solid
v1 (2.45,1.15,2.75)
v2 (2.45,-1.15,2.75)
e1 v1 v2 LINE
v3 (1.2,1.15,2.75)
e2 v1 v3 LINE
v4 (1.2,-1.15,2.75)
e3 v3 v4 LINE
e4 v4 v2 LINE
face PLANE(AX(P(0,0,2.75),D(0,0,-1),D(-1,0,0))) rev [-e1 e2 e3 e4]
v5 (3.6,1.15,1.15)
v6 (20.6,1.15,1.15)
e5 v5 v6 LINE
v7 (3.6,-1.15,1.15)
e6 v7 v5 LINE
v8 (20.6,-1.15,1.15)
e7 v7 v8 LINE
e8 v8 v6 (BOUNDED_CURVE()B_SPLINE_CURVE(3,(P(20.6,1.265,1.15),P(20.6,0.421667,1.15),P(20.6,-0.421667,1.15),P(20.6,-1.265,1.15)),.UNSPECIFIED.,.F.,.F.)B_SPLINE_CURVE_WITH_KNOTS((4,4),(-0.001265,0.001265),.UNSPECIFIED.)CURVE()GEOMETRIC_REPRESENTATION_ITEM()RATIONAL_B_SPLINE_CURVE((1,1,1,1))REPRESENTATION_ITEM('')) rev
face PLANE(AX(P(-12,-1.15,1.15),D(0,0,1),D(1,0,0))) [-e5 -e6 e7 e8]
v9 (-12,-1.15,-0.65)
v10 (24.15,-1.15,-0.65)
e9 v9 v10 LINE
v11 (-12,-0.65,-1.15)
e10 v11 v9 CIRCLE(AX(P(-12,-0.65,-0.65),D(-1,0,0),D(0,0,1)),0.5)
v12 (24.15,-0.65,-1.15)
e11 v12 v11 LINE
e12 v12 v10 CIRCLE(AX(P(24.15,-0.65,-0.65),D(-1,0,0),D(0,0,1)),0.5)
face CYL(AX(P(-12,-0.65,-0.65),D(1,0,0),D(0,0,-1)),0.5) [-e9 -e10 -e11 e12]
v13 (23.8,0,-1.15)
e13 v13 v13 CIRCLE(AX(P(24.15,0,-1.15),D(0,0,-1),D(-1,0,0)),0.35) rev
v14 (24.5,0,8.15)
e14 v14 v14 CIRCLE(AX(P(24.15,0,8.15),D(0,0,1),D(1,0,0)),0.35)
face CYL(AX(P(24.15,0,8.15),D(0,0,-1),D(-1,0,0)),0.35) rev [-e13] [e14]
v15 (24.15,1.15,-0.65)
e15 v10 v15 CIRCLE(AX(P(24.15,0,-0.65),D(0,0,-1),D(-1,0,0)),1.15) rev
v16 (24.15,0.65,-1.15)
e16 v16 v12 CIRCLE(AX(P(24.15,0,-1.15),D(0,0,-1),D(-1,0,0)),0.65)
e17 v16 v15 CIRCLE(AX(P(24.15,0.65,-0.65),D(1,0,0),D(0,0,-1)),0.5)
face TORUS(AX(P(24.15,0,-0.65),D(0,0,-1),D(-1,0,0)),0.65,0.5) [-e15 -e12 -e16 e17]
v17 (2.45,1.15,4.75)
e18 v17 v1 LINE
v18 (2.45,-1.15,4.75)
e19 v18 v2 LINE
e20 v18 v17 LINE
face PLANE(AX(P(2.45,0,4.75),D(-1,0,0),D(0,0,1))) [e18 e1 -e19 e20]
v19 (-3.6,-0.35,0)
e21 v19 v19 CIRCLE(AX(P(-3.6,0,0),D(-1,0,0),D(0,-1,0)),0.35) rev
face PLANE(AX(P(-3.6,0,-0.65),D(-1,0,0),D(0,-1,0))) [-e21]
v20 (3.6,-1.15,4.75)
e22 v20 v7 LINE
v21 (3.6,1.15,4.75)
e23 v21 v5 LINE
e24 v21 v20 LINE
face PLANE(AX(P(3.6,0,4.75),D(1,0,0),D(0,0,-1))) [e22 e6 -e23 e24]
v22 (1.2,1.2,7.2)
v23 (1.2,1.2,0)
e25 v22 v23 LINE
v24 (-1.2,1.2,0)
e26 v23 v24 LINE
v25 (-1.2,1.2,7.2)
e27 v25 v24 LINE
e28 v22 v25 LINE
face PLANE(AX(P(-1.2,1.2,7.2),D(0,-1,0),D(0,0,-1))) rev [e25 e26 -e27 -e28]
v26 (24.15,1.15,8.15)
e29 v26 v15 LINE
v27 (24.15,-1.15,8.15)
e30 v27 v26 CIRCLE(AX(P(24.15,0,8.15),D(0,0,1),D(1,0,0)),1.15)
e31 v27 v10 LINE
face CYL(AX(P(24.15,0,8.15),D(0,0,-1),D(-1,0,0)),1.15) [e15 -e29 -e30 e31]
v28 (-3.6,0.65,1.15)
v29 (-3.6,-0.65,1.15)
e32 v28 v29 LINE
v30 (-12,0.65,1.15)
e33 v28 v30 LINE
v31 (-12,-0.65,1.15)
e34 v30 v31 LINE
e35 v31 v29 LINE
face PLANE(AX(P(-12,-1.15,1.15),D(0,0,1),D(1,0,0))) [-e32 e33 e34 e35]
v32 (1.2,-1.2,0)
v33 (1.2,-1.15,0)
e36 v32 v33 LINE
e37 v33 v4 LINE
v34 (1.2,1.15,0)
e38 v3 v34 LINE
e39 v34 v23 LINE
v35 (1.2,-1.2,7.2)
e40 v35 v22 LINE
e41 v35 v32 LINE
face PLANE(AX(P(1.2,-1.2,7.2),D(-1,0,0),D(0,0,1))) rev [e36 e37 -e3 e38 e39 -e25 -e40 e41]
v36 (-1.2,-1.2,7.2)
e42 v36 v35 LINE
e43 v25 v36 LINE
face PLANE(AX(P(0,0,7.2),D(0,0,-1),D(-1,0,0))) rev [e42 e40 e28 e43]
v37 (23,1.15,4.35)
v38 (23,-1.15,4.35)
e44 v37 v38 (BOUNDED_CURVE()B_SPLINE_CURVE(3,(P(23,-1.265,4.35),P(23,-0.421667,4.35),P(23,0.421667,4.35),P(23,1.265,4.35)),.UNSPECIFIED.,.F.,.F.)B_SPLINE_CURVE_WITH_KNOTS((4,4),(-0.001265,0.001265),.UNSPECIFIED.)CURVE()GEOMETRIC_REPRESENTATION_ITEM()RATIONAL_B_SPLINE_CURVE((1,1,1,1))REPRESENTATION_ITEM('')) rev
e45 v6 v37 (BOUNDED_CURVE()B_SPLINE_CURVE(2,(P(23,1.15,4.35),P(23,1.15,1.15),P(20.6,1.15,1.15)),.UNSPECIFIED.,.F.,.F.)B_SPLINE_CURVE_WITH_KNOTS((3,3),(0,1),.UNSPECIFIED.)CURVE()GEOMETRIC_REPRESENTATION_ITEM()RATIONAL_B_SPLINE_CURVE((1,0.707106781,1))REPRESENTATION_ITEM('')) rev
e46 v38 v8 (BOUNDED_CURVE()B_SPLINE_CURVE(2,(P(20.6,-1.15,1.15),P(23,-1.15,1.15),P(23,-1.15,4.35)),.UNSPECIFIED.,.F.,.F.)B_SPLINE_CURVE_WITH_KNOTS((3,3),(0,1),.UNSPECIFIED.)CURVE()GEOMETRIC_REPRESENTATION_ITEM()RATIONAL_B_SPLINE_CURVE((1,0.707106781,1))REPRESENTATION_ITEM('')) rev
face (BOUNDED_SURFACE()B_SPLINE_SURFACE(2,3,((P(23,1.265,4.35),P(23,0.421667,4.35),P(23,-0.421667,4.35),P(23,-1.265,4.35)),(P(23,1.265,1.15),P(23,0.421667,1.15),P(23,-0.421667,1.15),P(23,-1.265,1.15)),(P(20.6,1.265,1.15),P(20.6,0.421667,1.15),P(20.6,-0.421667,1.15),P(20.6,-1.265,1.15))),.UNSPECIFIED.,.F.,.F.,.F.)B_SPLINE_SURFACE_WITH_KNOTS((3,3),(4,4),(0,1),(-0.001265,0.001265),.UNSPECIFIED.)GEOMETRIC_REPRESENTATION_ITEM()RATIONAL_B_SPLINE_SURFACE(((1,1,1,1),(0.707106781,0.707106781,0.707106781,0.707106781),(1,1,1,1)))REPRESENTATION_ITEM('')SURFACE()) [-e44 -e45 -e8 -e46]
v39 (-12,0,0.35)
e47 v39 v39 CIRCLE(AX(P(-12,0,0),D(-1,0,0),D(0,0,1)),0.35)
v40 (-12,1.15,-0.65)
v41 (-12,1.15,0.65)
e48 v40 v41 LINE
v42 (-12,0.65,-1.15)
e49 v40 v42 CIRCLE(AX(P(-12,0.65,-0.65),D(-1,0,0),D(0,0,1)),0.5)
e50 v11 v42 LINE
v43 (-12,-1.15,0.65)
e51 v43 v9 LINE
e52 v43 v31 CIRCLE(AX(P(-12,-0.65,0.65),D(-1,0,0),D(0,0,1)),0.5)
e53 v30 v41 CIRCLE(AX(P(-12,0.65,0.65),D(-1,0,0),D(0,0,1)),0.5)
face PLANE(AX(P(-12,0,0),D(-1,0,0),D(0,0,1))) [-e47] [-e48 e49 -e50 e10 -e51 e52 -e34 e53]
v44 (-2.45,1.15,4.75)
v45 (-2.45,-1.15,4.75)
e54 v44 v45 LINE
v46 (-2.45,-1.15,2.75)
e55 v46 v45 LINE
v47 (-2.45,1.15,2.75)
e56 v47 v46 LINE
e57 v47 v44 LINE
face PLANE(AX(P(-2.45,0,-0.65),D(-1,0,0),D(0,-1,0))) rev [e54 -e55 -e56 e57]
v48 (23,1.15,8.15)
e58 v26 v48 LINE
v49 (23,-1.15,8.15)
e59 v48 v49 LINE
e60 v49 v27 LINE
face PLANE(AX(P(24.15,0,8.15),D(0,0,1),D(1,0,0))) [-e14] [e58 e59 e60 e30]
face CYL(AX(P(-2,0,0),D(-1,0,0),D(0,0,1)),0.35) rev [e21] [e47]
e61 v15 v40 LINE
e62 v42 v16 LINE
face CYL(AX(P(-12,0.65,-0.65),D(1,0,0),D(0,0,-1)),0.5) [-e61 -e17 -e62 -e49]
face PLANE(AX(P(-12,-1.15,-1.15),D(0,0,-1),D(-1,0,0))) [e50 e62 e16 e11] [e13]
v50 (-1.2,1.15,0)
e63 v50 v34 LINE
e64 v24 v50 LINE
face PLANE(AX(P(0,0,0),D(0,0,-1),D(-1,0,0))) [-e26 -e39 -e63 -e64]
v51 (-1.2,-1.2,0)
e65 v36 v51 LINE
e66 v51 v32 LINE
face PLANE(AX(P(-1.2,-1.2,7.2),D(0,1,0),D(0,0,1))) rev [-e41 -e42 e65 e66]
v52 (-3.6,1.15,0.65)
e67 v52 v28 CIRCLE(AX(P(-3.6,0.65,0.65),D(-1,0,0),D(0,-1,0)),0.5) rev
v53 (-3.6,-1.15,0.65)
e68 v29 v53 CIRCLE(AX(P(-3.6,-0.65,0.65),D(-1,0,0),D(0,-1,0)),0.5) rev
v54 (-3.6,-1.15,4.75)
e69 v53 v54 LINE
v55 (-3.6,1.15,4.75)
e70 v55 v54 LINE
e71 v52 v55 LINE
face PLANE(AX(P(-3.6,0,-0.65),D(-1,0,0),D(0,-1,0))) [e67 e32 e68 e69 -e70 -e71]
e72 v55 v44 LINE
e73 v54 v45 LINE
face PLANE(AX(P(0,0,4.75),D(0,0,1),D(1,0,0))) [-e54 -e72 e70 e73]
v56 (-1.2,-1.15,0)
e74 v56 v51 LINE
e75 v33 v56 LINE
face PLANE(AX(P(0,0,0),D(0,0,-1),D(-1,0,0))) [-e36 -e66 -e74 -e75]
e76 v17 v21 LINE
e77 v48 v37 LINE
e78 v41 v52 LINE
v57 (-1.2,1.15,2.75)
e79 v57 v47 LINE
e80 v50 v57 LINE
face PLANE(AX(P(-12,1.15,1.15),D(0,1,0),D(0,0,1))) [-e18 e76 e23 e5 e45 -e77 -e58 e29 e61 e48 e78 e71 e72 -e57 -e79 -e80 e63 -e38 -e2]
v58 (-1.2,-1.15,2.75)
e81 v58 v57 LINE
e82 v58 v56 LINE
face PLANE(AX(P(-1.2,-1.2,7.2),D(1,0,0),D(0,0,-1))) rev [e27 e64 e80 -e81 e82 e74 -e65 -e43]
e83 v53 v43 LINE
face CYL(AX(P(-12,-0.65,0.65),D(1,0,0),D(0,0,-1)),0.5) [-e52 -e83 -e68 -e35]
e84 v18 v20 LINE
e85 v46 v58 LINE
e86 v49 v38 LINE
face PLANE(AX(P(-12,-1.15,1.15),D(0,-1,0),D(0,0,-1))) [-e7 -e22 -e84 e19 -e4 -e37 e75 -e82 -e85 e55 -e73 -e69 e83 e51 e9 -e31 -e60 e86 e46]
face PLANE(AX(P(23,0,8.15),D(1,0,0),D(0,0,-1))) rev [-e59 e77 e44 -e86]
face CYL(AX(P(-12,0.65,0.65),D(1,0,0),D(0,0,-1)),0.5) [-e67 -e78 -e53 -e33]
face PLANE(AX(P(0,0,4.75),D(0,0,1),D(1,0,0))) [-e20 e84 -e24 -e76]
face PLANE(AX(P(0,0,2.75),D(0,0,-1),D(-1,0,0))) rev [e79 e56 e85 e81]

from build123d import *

# Parameters (mm, degrees)
SKETCH_1_W           = 2.4
SKETCH_1_H           = 2.4
EXTRUDE_1_DEPTH      = 7.2
EXTRUDE_2_DEPTH      = 23
EXTRUDE_2_DEPTH_BACK = 12
SKETCH_4_W           = 2.3
SKETCH_4_H           = 2.3
EXTRUDE_3_DEPTH      = 7
EXTRUDE_3_DEPTH_BACK = 2.3
SKETCH_5_R           = 0.35
SKETCH_6_R           = 0.35
CUT_EXTRUDE_1_DEPTH  = 10
FILLET_1_SIZE        = 2.4
FILLET_1_SIZE_2      = 3.2
FILLET_2_R           = 0.5
EXTRUDE_START        = -1.5
SKETCH_7_W           = 1.15
SKETCH_7_H           = 0.5
SKETCH_7_H_2         = 1.3
SKETCH_7_H_3         = 2.3
EXTRUDE_4_DEPTH      = 5.1
SKETCH_8_W           = 7.2
SKETCH_8_H           = 2.3
EXTRUDE_5_DEPTH      = 3.1


with BuildPart() as part:
    # 草图1 → 凸台-拉伸1 (new body)
    with BuildSketch(Plane.XY):
        Rectangle(SKETCH_1_W, SKETCH_1_H)
    extrude(amount=EXTRUDE_1_DEPTH)

    # 草图4 → 凸台-拉伸2 (add, two sides: drawn at the far end of the back side and taken through both)
    with BuildSketch(Plane(origin=(0, 0, 0), x_dir=(0, 0, -1), z_dir=(1, 0, 0)).offset(-EXTRUDE_2_DEPTH_BACK)):
        Rectangle(SKETCH_4_W, SKETCH_4_H)
    extrude(amount=EXTRUDE_2_DEPTH + EXTRUDE_2_DEPTH_BACK)

    # 草图5 → 凸台-拉伸3 (add, two sides: drawn at the far end of the back side and taken through both)
    with BuildSketch(Plane.XY.offset(1.15).offset(-EXTRUDE_3_DEPTH_BACK)):
        with BuildLine():
            Line((23, 0), (23, 1.15))
            Line((23, 1.15), (24.15, 1.15))
            ThreePointArc((24.15, 1.15), (25.3, 0), (24.15, -1.15))
            Line((24.15, -1.15), (23, -1.15))
            Line((23, -1.15), (23, 0))
        make_face()
        with Locations(Location((24.15, 0, 0), (0, 0, 180))):
            Circle(SKETCH_5_R, mode=Mode.SUBTRACT)
    extrude(amount=EXTRUDE_3_DEPTH + EXTRUDE_3_DEPTH_BACK)

    # 草图6 → 切除-拉伸1 (cut)
    with BuildSketch(Plane.ZY.offset(12)):
        Circle(SKETCH_6_R)
    extrude(amount=-CUT_EXTRUDE_1_DEPTH, mode=Mode.SUBTRACT)

    # 圆角1
    # an asymmetric fillet: 3.2, 2.4 mm, written as the material it adds along each edge
    with BuildSketch(Plane(origin=(23, 1.15, 1.15), x_dir=(-1, 0, 0), z_dir=(0, -1, 0))) as fillet_1_piece_1:
        with BuildLine():
            Bezier((FILLET_1_SIZE, 0), (0, 0), (0, -FILLET_1_SIZE_2), weights=[1, 0.707106781, 1])
            Line((0, -FILLET_1_SIZE_2), (0, 0))
            Line((0, 0), (FILLET_1_SIZE, 0))
        make_face()
    extrude(amount=2.3)

    # 圆角2
    fillet_2_edges = [part.edges().sort_by_distance(p)[0] for p in [
        (-6.6, -1.15, 1.15),
        (6.075, -1.15, -1.15),
        (-6.6, 1.15, 1.15),
        (6.075, 1.15, -1.15),
        (25.3, 0, -1.15),
    ]]
    fillet(fillet_2_edges, radius=FILLET_2_R)

    # 草图7 → 凸台-拉伸4 (add)
    with BuildSketch(Plane.XY.offset(1.15).offset(EXTRUDE_START)):
        with Locations((-3.025, 0.9)):
            Rectangle(SKETCH_7_W, SKETCH_7_H)
        with Locations((-3.025, 0)):
            Rectangle(SKETCH_7_W, SKETCH_7_H_2)
        with Locations((-3.025, -0.9)):
            Rectangle(SKETCH_7_W, SKETCH_7_H)
        with Locations((3.025, 0)):
            Rectangle(SKETCH_7_W, SKETCH_7_H_3)
    extrude(amount=EXTRUDE_4_DEPTH)

    # 草图8 → 凸台-拉伸5 (add)
    with BuildSketch(Plane.XY.offset(1.15).offset(EXTRUDE_START)):
        Rectangle(SKETCH_8_W, SKETCH_8_H)
    extrude(amount=EXTRUDE_5_DEPTH)


solid = part.part
